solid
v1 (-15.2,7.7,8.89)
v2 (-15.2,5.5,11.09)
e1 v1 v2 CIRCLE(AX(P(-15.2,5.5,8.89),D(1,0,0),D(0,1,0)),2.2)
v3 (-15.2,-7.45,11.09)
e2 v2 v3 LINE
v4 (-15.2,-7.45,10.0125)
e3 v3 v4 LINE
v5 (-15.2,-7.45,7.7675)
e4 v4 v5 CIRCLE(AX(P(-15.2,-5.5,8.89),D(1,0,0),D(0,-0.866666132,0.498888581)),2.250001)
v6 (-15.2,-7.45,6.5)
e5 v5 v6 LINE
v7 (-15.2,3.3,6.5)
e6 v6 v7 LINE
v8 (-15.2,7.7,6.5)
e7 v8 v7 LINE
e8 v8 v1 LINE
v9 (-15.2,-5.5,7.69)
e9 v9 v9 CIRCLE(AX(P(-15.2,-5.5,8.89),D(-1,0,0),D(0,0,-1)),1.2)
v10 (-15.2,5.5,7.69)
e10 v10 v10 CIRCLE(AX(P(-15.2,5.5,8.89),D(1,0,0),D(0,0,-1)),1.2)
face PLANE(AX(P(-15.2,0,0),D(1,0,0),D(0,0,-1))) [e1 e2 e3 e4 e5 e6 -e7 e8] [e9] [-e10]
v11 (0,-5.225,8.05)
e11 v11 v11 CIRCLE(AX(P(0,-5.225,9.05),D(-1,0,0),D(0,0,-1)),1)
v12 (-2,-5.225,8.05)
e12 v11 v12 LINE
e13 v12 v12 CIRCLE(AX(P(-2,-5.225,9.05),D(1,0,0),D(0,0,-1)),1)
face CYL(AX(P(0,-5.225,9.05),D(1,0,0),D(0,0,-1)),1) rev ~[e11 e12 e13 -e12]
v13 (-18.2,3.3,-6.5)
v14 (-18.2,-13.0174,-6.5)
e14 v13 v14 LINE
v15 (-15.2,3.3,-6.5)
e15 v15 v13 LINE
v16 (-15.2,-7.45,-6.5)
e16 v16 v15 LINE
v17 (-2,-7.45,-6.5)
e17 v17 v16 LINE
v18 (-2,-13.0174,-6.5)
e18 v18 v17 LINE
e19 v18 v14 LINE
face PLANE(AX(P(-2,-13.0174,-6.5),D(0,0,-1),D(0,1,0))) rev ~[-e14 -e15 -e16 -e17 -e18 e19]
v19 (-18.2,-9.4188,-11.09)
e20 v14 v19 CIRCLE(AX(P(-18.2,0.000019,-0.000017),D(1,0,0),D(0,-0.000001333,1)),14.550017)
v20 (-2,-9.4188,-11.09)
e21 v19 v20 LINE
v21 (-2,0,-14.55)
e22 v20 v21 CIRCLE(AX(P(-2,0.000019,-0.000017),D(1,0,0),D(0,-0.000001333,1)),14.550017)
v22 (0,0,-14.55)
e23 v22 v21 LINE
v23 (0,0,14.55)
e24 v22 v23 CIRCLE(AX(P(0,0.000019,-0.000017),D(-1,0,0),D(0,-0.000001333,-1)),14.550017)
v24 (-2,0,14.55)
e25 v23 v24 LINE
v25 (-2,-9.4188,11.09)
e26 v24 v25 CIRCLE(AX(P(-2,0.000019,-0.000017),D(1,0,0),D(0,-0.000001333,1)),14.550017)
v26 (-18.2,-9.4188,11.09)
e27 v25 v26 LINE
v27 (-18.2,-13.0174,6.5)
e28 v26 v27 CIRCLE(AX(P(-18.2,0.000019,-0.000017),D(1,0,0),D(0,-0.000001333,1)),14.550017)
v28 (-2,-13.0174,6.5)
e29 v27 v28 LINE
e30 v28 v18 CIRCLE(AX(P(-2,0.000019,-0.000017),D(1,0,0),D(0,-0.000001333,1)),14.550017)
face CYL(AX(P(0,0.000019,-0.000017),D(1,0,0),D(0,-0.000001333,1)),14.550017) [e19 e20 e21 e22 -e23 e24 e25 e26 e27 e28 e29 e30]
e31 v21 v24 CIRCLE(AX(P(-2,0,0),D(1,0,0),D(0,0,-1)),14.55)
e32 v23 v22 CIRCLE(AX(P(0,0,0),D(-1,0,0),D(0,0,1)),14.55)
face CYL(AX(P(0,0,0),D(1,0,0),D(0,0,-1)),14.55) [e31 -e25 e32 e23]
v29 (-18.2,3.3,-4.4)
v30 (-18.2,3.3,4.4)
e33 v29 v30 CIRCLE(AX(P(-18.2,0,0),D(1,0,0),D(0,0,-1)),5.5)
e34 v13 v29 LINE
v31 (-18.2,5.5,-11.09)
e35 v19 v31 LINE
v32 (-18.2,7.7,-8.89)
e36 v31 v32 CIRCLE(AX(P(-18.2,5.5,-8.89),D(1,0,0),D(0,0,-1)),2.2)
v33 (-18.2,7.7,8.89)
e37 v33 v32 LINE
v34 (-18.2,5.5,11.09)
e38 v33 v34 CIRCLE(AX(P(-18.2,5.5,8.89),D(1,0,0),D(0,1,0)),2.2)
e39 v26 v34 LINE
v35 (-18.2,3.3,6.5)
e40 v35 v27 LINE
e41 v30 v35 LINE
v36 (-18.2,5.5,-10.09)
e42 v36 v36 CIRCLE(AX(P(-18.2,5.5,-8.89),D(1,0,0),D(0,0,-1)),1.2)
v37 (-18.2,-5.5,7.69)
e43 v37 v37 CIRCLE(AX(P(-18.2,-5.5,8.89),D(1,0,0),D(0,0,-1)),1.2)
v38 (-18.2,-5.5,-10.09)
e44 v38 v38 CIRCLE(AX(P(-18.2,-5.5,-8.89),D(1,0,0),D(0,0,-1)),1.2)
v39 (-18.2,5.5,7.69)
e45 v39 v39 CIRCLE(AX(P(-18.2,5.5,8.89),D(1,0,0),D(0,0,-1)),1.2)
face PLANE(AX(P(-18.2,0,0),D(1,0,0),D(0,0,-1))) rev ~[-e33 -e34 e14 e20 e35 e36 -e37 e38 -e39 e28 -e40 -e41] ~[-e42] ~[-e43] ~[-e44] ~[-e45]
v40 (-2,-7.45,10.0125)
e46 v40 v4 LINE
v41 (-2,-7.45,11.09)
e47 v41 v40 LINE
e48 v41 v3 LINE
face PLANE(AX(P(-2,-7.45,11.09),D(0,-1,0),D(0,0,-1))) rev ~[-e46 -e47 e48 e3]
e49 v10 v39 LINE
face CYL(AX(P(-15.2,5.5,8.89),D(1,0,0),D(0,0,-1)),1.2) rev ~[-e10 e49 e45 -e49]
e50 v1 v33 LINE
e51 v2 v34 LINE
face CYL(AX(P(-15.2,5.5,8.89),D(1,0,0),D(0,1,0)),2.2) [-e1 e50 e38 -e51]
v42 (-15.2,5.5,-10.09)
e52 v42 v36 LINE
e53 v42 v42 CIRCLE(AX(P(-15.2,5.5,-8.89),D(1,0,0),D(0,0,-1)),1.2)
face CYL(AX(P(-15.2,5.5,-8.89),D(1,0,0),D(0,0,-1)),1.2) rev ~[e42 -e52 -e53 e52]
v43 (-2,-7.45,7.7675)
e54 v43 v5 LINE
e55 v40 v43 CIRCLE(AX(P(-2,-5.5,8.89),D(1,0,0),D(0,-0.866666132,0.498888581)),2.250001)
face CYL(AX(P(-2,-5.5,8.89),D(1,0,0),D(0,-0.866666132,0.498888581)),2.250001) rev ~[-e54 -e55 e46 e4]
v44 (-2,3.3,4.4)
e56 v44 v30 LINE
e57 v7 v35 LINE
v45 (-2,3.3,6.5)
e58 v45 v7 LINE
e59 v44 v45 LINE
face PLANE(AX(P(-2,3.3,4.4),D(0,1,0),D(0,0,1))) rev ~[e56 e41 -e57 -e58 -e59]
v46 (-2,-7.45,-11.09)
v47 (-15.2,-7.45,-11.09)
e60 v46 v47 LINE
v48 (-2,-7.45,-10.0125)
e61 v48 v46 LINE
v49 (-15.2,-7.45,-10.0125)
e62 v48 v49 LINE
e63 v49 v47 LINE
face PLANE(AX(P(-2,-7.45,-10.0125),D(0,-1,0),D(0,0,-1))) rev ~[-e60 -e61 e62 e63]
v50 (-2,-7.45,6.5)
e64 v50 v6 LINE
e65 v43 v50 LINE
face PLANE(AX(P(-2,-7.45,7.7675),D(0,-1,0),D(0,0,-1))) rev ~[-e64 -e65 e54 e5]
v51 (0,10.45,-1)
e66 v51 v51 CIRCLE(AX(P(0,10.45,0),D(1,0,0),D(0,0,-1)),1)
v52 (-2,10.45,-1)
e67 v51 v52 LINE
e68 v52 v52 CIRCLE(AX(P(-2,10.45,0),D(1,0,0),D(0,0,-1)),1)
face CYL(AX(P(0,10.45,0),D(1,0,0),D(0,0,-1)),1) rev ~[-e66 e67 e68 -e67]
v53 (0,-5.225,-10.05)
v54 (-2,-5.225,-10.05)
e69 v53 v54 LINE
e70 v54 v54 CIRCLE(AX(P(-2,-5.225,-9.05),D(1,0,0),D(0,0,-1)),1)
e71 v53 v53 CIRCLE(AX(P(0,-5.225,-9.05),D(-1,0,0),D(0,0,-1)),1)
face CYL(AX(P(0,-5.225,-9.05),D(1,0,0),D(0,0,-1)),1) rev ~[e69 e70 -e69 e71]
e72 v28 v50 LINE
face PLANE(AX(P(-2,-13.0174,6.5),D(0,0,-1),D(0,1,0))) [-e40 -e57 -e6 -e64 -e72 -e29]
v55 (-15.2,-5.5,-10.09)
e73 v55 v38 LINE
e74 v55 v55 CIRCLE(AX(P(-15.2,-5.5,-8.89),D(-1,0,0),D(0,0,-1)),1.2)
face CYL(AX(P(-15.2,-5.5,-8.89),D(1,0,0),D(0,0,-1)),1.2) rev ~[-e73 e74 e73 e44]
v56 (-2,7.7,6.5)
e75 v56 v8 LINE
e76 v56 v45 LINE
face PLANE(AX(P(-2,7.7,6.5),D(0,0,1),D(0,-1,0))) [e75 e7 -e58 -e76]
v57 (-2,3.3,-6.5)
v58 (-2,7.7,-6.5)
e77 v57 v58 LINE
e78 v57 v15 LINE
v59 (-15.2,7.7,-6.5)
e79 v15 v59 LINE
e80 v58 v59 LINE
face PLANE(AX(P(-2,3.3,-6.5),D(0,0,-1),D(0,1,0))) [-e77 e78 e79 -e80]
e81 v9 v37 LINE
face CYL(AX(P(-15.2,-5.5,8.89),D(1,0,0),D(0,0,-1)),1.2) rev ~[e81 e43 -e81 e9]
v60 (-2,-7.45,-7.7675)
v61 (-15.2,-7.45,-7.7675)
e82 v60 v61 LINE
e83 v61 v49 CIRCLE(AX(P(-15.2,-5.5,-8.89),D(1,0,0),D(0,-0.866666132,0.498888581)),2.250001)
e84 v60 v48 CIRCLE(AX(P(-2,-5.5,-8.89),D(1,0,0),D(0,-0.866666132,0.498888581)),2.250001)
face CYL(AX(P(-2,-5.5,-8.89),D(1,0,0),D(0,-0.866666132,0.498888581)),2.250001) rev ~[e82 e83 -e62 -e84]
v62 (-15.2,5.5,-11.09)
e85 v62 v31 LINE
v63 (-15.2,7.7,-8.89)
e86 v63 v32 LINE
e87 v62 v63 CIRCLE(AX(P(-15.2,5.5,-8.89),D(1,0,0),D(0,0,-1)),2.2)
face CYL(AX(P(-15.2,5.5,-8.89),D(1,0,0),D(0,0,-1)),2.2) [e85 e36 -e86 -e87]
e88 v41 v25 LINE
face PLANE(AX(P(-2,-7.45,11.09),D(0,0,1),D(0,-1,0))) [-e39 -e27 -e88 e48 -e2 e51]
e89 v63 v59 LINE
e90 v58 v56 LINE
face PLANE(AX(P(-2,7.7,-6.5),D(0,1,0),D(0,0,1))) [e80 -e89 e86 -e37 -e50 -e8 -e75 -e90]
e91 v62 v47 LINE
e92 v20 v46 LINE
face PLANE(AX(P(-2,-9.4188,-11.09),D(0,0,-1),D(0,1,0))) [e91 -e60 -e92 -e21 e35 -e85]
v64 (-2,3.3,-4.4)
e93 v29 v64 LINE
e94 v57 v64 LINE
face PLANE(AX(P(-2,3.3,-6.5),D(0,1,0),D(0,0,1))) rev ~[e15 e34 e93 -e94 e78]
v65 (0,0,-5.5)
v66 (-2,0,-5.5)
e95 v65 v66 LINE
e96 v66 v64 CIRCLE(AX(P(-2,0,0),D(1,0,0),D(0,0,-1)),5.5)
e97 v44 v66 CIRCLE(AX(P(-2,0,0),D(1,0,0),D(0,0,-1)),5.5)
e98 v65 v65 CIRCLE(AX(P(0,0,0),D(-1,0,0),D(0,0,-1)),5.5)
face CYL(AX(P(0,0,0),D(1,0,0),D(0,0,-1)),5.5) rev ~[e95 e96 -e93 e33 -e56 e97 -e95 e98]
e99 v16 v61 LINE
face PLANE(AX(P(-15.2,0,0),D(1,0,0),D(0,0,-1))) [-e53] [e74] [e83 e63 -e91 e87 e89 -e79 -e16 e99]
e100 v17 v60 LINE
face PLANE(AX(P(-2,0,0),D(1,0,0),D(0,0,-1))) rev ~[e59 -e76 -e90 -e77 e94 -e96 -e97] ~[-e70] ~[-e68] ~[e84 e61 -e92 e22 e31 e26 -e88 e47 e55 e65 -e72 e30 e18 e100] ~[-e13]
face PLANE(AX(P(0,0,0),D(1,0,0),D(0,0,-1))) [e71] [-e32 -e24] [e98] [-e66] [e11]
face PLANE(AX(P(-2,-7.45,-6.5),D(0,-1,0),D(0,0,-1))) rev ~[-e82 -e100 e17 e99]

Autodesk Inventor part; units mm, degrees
ref_plane "YZ Plane" through (0, 0, 0) normal (1, 0, 0) x (0, 1, 0)
ref_plane "XZ Plane" through (0, 0, 0) normal (0, 1, 0) x (-1, 0, 0)
ref_plane "Arbeitsebene1" through (0, 0, 0) normal (1, 0, 0) x (0, 0, -1)
sketch "Skizze1" plane through (0, 0, 0) normal (1, 0, 0) x (0, 0, -1)
  arc A0 (14.55, 0) -> (-14.55, 0) centre (0, 0) ccw
  circle A1 centre (0, 0) radius 5.5
  line L0 (-20.8128, 0) -> (22.3238, 0) construction
  line L1 (0, -22.3037) -> (0, 20.6923) construction
  circle A2 centre (0, 10.45) radius 1
  circle A3 centre (-9.05, -5.225) radius 1
  circle A4 centre (9.05, -5.225) radius 1
  circle A5 centre (0, 0) radius 10.45 construction
  line L2 (0, 0) -> (9.05, -5.225) construction
  line L3 (0, 0) -> (-9.05, -5.225) construction
  line L4 (8.89, -5.5) -> (-8.89, -5.5) construction
  line L5 (-8.89, -5.5) -> (-8.89, 5.5) construction
  line L6 (-8.89, 5.5) -> (8.89, 5.5) construction
  line L7 (8.89, 5.5) -> (8.89, -5.5) construction
  circle A6 centre (8.89, 5.5) radius 1.2
  circle A7 centre (-8.89, 5.5) radius 1.2
  arc A8 (-14.55, 0) -> (14.1469, 3.4013) centre (0, 0) ccw
  line L8 (8.89, 7.7) -> (-8.89, 7.7)
  line L9 (6.5, 3.3) -> (6.5, 7.7)
  line L10 (-4.3414, 8.5633) -> (-4.3414, 8.4781)
  line L11 (-6.5, 7.7) -> (-6.5, 3.3)
  arc A9 (4.4, 3.3) -> (-4.4, 3.3) centre (0, 0) ccw
  line L12 (6.5, 3.3) -> (4.4, 3.3)
  line L13 (-4.4, 3.3) -> (-6.5, 3.3)
  line L14 (-6.5, -13.0174) -> (-6.5, -7.45)
  line L15 (6.5, -13.0174) -> (6.5, -7.45)
  line L16 (11.09, -9.4188) -> (11.09, -7.45)
  circle A10 centre (8.89, -5.5) radius 1.2
  circle A11 centre (-8.89, -5.5) radius 1.2
  line L17 (11.09, -7.45) -> (11.09, 5.5)
  line L18 (-6.5, -7.45) -> (-6.5, 3.3)
  line L19 (-11.09, -7.45) -> (-11.09, 5.5)
  arc A12 (-8.89, 7.7) -> (-11.09, 5.5) centre (-8.89, 5.5) ccw
  arc A13 (11.09, 5.5) -> (8.89, 7.7) centre (8.89, 5.5) ccw
  arc A14 (7.7675, -7.45) -> (10.0125, -7.45) centre (8.89, -5.5) ccw
  line L20 (6.5, -7.45) -> (7.7675, -7.45)
  line L21 (10.0125, -7.45) -> (11.09, -7.45)
  arc A15 (-10.0125, -7.45) -> (-7.7675, -7.45) centre (-8.89, -5.5) ccw
  line L22 (-11.09, -7.45) -> (-10.0125, -7.45)
  line L23 (-7.7675, -7.45) -> (-6.5, -7.45)
  line L24 (6.5, -7.45) -> (6.5, 3.3)
  line L25 (-11.09, -7.45) -> (-11.09, -9.4188)
  point P0 (0, 14.55)
  dimension "d2" = 11
  dimension "d9" = 2
  dimension "d11" = 120
  dimension "d12" = 20.9
  dimension "d19" = 11
  dimension "d20" = 17.78
  dimension "d22" = 2.4
  dimension "d29" = 14.55
  dimension "d30" = 5.5
  dimension "d38" = 2.2
  dimension "d39" = 13
  dimension "d42" = 4.5
  dimension "d43" = 0.3
extrude "Extrusion1" add sketch "Skizze1" against normal blind 2 contours A8 L16 L17 A13 L8 A12 L19 L25 A0 | A8 L15 L20 A14 L21 L16 | A8 L14 L18 L13 A1 L12 L24 L15 | L21 A14 L20 L24 L9 L8 A13 L17 | L25 L22 A15 L23 L14 A8 | L19 A12 L8 L11 L18 L23 A15 L22 | L12 A1 L13 L11 L8 L9 | A3 A11 | A4 A10 | A6 | A7 picked at (-8.3922, -6.3901) picked at (8.4037, -6.3962)
extrude "Extrusion3" add sketch "Skizze1" against normal blind 13.2 from surface at -2 contours A8 L15 L20 A14 L21 L16 | L25 L22 A15 L23 L14 A8 | L12 A1 L13 L11 L8 L9
extrude "Extrusion4" add sketch "Skizze1" against normal blind 3 from surface at -15.2 contours A8 L15 L20 A14 L21 L16 | L21 A14 L20 L24 L9 L8 A13 L17 | L25 L22 A15 L23 L14 A8 | L19 A12 L8 L11 L18 L23 A15 L22 | L12 A1 L13 L11 L8 L9 | A11 A3 | A10 A4 picked at (-9.542, -4.4536) picked at (9.542, -4.4536)
properties part number "AS5047DEnclosure"
